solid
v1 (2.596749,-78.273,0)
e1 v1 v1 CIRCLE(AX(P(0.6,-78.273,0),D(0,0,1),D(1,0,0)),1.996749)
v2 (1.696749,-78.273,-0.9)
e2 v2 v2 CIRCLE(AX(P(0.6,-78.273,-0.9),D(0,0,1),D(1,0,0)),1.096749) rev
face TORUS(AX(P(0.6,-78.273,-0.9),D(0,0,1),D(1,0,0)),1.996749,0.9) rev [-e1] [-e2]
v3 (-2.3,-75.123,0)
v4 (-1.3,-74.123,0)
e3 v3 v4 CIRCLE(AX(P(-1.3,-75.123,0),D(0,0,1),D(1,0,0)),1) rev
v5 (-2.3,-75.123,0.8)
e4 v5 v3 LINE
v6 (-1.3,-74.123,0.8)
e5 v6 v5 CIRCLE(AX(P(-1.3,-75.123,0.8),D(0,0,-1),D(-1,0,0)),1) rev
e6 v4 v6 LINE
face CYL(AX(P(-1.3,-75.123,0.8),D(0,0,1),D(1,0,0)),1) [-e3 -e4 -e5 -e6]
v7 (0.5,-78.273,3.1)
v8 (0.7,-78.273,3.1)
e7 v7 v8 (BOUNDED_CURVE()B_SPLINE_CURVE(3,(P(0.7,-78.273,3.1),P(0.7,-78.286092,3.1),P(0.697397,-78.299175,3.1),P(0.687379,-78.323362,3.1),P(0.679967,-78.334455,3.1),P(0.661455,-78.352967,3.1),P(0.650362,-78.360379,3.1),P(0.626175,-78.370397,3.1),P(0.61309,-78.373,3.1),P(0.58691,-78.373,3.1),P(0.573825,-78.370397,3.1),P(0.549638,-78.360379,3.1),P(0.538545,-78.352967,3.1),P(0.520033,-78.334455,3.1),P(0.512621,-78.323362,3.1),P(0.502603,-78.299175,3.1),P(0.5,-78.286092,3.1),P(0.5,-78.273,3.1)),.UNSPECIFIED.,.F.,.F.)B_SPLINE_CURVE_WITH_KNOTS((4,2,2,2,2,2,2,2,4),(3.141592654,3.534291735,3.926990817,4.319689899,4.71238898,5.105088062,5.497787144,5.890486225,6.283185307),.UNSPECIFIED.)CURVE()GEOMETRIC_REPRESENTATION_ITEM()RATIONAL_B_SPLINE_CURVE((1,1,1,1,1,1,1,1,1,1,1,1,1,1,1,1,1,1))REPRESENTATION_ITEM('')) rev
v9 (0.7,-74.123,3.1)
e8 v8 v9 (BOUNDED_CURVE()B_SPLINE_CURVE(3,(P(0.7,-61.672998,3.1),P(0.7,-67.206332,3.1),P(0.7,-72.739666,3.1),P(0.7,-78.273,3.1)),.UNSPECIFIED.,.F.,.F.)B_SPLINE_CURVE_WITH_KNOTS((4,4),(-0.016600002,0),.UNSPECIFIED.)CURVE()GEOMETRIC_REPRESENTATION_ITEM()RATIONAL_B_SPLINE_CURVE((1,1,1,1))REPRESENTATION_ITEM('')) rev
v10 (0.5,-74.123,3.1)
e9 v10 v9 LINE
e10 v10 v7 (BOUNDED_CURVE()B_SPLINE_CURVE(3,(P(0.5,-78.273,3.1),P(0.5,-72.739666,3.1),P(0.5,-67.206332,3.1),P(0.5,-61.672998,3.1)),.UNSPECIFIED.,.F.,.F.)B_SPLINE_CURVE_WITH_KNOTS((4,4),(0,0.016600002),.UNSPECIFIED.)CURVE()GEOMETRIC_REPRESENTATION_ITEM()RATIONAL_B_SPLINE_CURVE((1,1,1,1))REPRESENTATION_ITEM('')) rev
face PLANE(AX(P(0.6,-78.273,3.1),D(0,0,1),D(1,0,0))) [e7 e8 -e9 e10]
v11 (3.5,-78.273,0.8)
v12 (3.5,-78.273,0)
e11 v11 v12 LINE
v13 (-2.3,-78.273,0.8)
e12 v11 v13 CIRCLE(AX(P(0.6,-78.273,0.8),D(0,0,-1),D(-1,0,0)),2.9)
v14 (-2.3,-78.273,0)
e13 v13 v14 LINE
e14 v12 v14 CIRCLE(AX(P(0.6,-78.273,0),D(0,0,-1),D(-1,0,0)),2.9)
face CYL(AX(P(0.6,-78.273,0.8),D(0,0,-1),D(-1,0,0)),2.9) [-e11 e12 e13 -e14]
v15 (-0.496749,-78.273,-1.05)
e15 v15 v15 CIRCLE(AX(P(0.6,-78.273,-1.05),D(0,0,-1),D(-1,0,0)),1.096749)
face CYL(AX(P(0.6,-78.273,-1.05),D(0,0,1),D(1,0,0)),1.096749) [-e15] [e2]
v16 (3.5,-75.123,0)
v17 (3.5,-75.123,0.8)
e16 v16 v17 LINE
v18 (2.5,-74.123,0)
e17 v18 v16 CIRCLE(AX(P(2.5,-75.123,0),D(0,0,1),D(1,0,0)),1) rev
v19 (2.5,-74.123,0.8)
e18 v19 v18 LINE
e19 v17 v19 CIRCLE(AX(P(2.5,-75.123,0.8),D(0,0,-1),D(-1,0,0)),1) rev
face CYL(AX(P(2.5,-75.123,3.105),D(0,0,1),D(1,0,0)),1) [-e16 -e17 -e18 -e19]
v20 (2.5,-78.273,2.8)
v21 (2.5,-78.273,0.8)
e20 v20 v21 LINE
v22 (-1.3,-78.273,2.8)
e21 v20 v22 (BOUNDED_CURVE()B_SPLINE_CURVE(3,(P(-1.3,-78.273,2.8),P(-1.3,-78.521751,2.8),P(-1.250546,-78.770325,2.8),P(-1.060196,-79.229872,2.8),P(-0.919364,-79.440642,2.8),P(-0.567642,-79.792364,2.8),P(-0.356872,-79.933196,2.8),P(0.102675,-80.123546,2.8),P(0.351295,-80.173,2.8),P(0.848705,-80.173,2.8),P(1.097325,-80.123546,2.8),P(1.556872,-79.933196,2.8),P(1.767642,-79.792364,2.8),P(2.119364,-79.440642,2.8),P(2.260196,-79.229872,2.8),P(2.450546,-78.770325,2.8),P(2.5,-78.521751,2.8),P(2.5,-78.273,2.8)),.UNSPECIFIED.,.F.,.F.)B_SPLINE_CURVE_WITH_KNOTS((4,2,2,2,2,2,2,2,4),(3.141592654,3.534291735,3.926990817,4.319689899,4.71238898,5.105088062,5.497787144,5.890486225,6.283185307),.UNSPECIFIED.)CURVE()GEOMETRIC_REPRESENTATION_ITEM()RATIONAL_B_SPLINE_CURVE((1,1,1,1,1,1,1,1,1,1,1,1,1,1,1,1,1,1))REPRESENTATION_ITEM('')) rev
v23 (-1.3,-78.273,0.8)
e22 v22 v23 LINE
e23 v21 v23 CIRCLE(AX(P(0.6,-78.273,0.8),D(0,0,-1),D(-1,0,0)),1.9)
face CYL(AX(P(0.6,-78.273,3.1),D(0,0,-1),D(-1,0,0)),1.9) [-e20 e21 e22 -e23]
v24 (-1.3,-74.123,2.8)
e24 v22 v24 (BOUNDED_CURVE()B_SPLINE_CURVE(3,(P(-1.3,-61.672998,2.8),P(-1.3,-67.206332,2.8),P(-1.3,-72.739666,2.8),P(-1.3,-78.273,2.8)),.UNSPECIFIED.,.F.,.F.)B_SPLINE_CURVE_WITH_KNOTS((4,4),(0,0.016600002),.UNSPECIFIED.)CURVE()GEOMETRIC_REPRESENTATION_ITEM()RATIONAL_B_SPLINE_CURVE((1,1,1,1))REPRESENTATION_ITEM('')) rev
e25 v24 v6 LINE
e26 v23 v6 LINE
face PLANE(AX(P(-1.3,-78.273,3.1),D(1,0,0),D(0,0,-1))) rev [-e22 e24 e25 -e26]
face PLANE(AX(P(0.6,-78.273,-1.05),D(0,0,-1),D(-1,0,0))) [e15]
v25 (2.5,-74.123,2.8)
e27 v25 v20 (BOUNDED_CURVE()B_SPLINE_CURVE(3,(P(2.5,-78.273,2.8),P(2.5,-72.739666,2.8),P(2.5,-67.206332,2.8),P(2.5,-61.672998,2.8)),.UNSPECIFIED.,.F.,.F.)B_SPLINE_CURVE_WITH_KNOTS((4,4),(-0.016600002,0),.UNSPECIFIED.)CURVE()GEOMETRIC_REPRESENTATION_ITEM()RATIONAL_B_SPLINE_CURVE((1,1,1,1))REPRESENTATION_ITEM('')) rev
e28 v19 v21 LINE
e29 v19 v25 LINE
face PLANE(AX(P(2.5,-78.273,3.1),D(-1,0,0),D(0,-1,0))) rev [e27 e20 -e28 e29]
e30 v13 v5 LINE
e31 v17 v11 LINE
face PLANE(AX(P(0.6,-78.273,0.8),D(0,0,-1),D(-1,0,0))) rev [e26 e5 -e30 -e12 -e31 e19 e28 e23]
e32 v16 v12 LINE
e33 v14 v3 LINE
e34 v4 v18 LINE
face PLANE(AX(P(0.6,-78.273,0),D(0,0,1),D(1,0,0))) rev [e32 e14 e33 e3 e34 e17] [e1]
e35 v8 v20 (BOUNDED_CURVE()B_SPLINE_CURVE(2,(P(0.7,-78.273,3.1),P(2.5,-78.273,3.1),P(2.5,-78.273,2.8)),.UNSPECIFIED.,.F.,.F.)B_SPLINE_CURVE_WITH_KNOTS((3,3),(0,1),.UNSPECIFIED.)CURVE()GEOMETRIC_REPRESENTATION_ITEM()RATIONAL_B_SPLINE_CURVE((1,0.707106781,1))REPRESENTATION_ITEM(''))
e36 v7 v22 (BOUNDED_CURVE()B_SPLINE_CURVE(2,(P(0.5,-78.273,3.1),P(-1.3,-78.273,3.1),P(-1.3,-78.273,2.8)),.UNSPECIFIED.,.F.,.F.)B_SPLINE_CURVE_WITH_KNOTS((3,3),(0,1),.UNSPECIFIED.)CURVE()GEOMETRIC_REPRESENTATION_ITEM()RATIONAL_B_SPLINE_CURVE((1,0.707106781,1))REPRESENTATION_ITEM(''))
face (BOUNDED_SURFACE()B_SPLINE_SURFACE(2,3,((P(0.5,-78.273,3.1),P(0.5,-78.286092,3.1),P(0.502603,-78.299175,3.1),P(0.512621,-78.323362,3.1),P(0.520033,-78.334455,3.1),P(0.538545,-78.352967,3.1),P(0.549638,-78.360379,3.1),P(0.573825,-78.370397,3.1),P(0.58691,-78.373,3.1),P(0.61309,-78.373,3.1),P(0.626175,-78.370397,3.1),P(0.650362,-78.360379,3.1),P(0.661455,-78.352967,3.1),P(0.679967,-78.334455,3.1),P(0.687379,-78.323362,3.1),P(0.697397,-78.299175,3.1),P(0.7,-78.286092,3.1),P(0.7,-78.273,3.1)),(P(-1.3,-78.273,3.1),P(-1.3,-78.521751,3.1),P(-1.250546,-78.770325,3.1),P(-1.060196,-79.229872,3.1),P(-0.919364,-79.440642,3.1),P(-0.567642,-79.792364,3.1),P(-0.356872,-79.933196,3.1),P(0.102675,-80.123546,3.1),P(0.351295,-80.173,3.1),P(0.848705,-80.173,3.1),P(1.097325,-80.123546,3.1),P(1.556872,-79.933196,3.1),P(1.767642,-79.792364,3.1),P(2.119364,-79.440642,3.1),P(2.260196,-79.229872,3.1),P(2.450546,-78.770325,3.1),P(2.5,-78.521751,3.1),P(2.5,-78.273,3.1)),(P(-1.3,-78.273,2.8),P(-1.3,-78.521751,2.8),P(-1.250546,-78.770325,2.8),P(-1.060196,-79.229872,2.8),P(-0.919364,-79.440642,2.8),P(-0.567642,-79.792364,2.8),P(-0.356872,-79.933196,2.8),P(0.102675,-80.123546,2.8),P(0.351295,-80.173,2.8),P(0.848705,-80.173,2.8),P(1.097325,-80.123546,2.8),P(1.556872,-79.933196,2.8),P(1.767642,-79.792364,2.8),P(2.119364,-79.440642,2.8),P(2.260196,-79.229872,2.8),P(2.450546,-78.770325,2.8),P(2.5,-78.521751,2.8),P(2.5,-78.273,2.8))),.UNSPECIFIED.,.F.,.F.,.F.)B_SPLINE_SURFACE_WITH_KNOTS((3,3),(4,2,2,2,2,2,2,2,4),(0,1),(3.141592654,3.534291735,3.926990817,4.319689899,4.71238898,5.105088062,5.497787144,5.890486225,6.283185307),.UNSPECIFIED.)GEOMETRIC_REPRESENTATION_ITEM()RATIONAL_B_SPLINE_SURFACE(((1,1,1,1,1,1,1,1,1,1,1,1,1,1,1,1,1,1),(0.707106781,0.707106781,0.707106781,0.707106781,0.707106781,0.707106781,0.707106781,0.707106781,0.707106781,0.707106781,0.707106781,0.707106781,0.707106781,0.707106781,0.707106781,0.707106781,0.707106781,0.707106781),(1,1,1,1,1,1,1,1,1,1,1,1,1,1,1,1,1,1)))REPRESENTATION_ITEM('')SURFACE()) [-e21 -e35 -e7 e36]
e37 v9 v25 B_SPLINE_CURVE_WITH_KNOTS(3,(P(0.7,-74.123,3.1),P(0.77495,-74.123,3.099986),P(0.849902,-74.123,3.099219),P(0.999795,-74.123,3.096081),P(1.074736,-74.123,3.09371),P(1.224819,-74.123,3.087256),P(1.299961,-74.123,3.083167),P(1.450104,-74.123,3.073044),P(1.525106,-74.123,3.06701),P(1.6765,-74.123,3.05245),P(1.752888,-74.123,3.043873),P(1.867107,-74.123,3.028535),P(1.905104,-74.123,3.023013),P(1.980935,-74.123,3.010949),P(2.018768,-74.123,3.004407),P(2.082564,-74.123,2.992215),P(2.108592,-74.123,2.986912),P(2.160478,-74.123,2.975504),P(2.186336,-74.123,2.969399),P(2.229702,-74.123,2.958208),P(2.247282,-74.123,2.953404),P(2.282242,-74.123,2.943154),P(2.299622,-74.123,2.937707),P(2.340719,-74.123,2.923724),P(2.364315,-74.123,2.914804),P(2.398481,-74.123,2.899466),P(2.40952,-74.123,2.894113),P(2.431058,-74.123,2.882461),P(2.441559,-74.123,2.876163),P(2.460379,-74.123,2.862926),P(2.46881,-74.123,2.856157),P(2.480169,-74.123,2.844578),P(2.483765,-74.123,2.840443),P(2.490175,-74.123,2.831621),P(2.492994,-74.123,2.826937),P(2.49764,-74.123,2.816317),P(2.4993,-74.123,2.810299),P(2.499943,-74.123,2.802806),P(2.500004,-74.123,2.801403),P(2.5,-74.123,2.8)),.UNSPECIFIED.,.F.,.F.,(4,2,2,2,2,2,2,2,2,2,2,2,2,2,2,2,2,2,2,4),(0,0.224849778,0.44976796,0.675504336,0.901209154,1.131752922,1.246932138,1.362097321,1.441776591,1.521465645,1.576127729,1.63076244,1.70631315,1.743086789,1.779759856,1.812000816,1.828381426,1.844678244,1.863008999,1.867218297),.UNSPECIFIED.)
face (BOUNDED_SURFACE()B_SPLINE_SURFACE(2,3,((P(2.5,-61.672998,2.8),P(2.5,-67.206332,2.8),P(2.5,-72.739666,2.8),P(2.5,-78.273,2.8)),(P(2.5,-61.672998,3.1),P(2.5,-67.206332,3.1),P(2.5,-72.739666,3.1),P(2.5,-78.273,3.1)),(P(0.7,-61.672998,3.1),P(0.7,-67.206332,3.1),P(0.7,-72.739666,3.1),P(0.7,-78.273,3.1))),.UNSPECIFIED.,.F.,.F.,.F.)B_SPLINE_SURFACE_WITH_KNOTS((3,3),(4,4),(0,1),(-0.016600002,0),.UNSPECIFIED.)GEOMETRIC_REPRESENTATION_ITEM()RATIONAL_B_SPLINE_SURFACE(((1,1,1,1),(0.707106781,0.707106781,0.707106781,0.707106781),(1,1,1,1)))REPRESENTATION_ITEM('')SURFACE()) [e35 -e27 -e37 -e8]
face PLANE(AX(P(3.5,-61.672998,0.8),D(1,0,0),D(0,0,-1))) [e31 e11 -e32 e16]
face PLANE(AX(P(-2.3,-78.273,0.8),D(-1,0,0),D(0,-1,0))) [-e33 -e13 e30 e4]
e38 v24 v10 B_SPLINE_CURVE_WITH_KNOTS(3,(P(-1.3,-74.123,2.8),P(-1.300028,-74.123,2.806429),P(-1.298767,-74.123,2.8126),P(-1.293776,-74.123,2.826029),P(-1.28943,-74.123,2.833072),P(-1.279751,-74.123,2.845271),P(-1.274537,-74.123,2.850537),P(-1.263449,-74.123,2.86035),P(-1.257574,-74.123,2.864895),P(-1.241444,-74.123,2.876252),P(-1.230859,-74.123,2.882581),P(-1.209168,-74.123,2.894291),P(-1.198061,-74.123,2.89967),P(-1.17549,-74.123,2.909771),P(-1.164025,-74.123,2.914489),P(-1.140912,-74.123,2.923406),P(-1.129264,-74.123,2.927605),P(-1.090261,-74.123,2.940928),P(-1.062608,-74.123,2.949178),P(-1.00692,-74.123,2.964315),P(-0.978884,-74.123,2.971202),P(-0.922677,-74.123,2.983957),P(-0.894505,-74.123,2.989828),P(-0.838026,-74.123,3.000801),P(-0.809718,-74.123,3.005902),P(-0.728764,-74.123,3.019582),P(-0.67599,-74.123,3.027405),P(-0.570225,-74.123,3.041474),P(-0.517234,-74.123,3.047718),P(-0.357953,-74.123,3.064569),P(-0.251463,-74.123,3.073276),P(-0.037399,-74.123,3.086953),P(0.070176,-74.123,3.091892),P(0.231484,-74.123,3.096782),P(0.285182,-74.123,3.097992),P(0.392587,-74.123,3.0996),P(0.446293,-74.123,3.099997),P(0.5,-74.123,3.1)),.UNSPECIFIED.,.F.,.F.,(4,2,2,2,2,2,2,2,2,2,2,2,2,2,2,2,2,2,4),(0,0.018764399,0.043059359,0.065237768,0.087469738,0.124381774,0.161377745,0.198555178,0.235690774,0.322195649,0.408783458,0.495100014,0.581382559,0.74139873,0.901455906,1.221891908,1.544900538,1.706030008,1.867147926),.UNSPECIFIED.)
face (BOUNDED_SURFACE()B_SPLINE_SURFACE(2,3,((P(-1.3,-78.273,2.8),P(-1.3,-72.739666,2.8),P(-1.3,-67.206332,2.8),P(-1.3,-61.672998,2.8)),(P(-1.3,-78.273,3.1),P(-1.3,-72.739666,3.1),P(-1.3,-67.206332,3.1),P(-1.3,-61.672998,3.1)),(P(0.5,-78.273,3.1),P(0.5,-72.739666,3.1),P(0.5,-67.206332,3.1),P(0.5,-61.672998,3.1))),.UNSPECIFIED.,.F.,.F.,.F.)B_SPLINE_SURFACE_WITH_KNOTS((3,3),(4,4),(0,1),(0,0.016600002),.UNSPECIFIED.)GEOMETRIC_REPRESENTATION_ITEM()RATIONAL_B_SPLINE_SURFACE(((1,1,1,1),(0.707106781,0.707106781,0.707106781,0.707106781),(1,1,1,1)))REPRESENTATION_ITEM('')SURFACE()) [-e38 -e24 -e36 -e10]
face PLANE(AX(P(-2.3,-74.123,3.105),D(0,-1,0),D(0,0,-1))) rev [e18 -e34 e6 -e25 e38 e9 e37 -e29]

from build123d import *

# Parameters (mm, degrees)
EXTRUDE_1_DEPTH          = 3.1
EXTRUDE_2_DEPTH          = 0.8
FILLET_1_SIZE            = 0.3
FILLET_1_SIZE_2          = 1.8
SKETCH_3_R               = 1
SKETCH_3_R_2             = 1.096749421
EXTRUDE_3_DEPTH          = 1.05
FILLET_5_R               = 0.9
CUT_EXTRUDE_2_DEPTH      = 82.307539193
CUT_EXTRUDE_2_DEPTH_BACK = 82.307539193
SKETCH_7_W               = 5.8
SKETCH_7_H               = 24.900002621
FILLET_6_R               = 1


with BuildPart() as part:
    # 草图1 → 凸台-拉伸1 (new body)
    with BuildSketch(Plane.XY):
        with BuildLine():
            Line((-1.3, -78.273), (-1.3, -61.672998253))
            ThreePointArc((-1.3, -61.672998253), (0.6, -59.772998253), (2.5, -61.672998253))
            Line((2.5, -61.672998253), (2.5, -78.273))
            ThreePointArc((2.5, -78.273), (0.6, -80.173), (-1.3, -78.273))
        make_face()
    extrude(amount=EXTRUDE_1_DEPTH)

    # 草图2 → 凸台-拉伸2 (add)
    with BuildSketch(Plane(origin=(0, 0, 0), x_dir=(-1, 0, 0), z_dir=(0, 0, -1))):
        with BuildLine():
            Line((2.3, -78.273), (2.3, -61.672998253))
            ThreePointArc((2.3, -61.672998253), (-0.6, -58.772998253), (-3.5, -61.672998253))
            Line((-3.5, -61.672998253), (-3.5, -78.273))
            ThreePointArc((-3.5, -78.273), (-0.6, -81.173), (2.3, -78.273))
        make_face()
    extrude(amount=-EXTRUDE_2_DEPTH)

    # 圆角1
    # an asymmetric fillet: 1.8, 0.3 mm, written as the material it takes off along each edge
    with BuildSketch(Plane(origin=(2.5, -61.672998253, 3.1), x_dir=(0, 0, -1), z_dir=(0, -1, 0)), Plane(origin=(-1.3, -78.273, 3.1), x_dir=(0, 0, -1), z_dir=(0, 1, 0))) as fillet_1_piece_1:
        with BuildLine():
            Bezier((FILLET_1_SIZE, 0), (0, 0), (0, -FILLET_1_SIZE_2), weights=[1, 0.707106781, 1])
            Line((0, -FILLET_1_SIZE_2), (0, 0))
            Line((0, 0), (FILLET_1_SIZE, 0))
        make_face()
    extrude(amount=16.600001747, mode=Mode.SUBTRACT)
    with BuildSketch(Plane(origin=(0.6, -61.672998253, 3.1), x_dir=(-1, 0, 0), z_dir=(0, -1, 0))) as fillet_1_piece_2:
        with BuildLine():
            Bezier((1.9, FILLET_1_SIZE), (1.9, 0), (1.9 - FILLET_1_SIZE_2, 0), weights=[1, 0.707106781, 1])
            Line((1.9 - FILLET_1_SIZE_2, 0), (1.9, 0))
            Line((1.9, 0), (1.9, FILLET_1_SIZE))
        make_face()
    revolve(axis=Axis((0.6, -61.672998253, 3.1), (0, 0, -1)), revolution_arc=180, mode=Mode.SUBTRACT)
    with BuildSketch(Plane(origin=(0.6, -78.273, 3.1), x_dir=(1, 0, 0), z_dir=(0, 1, 0))) as fillet_1_piece_3:
        with BuildLine():
            Bezier((1.9, FILLET_1_SIZE), (1.9, 0), (1.9 - FILLET_1_SIZE_2, 0), weights=[1, 0.707106781, 1])
            Line((1.9 - FILLET_1_SIZE_2, 0), (1.9, 0))
            Line((1.9, 0), (1.9, FILLET_1_SIZE))
        make_face()
    revolve(axis=Axis((0.6, -78.273, 3.1), (0, 0, -1)), revolution_arc=180, mode=Mode.SUBTRACT)

    # 草图3 → 凸台-拉伸3 (add)
    with BuildSketch(Plane(origin=(0, 0, 0), x_dir=(-1, 0, 0), z_dir=(0, 0, -1))):
        with Locations(Location((-0.6, -61.672998253, 0), (0, 0, 180))):
            Circle(SKETCH_3_R)
        with Locations(Location((-0.6, -69.972999126, 0), (0, 0, 180))):
            Circle(SKETCH_3_R_2)
        with Locations(Location((-0.6, -78.273, 0), (0, 0, 180))):
            Circle(SKETCH_3_R_2)
    extrude(amount=EXTRUDE_3_DEPTH)

    # 圆角5
    fillet_5_edges = [part.edges().sort_by_distance(p)[0] for p in [
        (-0.4, -61.672998253, 0),
        (-0.496749421, -69.972999126, 0),
        (-0.496749421, -78.273, 0),
    ]]
    fillet(fillet_5_edges, radius=FILLET_5_R)

    # 草图7 → 切除-拉伸2 (cut, two sides: drawn at the far end of the back side and taken through both)
    with BuildSketch(Plane(origin=(0, 0, 0), x_dir=(-1, 0, 0), z_dir=(0, 0, -1)).offset(-CUT_EXTRUDE_2_DEPTH_BACK)):
        with Locations((-0.6, -61.672998253)):
            Rectangle(SKETCH_7_W, SKETCH_7_H)
    extrude(amount=CUT_EXTRUDE_2_DEPTH + CUT_EXTRUDE_2_DEPTH_BACK, mode=Mode.SUBTRACT)

    # 圆角6
    fillet_6_edges = [part.edges().sort_by_distance(p)[0] for p in [
        (-2.3, -74.122999563, 0.4),
        (3.5, -74.122999563, 0.4),
    ]]
    fillet(fillet_6_edges, radius=FILLET_6_R)


solid = part.part
